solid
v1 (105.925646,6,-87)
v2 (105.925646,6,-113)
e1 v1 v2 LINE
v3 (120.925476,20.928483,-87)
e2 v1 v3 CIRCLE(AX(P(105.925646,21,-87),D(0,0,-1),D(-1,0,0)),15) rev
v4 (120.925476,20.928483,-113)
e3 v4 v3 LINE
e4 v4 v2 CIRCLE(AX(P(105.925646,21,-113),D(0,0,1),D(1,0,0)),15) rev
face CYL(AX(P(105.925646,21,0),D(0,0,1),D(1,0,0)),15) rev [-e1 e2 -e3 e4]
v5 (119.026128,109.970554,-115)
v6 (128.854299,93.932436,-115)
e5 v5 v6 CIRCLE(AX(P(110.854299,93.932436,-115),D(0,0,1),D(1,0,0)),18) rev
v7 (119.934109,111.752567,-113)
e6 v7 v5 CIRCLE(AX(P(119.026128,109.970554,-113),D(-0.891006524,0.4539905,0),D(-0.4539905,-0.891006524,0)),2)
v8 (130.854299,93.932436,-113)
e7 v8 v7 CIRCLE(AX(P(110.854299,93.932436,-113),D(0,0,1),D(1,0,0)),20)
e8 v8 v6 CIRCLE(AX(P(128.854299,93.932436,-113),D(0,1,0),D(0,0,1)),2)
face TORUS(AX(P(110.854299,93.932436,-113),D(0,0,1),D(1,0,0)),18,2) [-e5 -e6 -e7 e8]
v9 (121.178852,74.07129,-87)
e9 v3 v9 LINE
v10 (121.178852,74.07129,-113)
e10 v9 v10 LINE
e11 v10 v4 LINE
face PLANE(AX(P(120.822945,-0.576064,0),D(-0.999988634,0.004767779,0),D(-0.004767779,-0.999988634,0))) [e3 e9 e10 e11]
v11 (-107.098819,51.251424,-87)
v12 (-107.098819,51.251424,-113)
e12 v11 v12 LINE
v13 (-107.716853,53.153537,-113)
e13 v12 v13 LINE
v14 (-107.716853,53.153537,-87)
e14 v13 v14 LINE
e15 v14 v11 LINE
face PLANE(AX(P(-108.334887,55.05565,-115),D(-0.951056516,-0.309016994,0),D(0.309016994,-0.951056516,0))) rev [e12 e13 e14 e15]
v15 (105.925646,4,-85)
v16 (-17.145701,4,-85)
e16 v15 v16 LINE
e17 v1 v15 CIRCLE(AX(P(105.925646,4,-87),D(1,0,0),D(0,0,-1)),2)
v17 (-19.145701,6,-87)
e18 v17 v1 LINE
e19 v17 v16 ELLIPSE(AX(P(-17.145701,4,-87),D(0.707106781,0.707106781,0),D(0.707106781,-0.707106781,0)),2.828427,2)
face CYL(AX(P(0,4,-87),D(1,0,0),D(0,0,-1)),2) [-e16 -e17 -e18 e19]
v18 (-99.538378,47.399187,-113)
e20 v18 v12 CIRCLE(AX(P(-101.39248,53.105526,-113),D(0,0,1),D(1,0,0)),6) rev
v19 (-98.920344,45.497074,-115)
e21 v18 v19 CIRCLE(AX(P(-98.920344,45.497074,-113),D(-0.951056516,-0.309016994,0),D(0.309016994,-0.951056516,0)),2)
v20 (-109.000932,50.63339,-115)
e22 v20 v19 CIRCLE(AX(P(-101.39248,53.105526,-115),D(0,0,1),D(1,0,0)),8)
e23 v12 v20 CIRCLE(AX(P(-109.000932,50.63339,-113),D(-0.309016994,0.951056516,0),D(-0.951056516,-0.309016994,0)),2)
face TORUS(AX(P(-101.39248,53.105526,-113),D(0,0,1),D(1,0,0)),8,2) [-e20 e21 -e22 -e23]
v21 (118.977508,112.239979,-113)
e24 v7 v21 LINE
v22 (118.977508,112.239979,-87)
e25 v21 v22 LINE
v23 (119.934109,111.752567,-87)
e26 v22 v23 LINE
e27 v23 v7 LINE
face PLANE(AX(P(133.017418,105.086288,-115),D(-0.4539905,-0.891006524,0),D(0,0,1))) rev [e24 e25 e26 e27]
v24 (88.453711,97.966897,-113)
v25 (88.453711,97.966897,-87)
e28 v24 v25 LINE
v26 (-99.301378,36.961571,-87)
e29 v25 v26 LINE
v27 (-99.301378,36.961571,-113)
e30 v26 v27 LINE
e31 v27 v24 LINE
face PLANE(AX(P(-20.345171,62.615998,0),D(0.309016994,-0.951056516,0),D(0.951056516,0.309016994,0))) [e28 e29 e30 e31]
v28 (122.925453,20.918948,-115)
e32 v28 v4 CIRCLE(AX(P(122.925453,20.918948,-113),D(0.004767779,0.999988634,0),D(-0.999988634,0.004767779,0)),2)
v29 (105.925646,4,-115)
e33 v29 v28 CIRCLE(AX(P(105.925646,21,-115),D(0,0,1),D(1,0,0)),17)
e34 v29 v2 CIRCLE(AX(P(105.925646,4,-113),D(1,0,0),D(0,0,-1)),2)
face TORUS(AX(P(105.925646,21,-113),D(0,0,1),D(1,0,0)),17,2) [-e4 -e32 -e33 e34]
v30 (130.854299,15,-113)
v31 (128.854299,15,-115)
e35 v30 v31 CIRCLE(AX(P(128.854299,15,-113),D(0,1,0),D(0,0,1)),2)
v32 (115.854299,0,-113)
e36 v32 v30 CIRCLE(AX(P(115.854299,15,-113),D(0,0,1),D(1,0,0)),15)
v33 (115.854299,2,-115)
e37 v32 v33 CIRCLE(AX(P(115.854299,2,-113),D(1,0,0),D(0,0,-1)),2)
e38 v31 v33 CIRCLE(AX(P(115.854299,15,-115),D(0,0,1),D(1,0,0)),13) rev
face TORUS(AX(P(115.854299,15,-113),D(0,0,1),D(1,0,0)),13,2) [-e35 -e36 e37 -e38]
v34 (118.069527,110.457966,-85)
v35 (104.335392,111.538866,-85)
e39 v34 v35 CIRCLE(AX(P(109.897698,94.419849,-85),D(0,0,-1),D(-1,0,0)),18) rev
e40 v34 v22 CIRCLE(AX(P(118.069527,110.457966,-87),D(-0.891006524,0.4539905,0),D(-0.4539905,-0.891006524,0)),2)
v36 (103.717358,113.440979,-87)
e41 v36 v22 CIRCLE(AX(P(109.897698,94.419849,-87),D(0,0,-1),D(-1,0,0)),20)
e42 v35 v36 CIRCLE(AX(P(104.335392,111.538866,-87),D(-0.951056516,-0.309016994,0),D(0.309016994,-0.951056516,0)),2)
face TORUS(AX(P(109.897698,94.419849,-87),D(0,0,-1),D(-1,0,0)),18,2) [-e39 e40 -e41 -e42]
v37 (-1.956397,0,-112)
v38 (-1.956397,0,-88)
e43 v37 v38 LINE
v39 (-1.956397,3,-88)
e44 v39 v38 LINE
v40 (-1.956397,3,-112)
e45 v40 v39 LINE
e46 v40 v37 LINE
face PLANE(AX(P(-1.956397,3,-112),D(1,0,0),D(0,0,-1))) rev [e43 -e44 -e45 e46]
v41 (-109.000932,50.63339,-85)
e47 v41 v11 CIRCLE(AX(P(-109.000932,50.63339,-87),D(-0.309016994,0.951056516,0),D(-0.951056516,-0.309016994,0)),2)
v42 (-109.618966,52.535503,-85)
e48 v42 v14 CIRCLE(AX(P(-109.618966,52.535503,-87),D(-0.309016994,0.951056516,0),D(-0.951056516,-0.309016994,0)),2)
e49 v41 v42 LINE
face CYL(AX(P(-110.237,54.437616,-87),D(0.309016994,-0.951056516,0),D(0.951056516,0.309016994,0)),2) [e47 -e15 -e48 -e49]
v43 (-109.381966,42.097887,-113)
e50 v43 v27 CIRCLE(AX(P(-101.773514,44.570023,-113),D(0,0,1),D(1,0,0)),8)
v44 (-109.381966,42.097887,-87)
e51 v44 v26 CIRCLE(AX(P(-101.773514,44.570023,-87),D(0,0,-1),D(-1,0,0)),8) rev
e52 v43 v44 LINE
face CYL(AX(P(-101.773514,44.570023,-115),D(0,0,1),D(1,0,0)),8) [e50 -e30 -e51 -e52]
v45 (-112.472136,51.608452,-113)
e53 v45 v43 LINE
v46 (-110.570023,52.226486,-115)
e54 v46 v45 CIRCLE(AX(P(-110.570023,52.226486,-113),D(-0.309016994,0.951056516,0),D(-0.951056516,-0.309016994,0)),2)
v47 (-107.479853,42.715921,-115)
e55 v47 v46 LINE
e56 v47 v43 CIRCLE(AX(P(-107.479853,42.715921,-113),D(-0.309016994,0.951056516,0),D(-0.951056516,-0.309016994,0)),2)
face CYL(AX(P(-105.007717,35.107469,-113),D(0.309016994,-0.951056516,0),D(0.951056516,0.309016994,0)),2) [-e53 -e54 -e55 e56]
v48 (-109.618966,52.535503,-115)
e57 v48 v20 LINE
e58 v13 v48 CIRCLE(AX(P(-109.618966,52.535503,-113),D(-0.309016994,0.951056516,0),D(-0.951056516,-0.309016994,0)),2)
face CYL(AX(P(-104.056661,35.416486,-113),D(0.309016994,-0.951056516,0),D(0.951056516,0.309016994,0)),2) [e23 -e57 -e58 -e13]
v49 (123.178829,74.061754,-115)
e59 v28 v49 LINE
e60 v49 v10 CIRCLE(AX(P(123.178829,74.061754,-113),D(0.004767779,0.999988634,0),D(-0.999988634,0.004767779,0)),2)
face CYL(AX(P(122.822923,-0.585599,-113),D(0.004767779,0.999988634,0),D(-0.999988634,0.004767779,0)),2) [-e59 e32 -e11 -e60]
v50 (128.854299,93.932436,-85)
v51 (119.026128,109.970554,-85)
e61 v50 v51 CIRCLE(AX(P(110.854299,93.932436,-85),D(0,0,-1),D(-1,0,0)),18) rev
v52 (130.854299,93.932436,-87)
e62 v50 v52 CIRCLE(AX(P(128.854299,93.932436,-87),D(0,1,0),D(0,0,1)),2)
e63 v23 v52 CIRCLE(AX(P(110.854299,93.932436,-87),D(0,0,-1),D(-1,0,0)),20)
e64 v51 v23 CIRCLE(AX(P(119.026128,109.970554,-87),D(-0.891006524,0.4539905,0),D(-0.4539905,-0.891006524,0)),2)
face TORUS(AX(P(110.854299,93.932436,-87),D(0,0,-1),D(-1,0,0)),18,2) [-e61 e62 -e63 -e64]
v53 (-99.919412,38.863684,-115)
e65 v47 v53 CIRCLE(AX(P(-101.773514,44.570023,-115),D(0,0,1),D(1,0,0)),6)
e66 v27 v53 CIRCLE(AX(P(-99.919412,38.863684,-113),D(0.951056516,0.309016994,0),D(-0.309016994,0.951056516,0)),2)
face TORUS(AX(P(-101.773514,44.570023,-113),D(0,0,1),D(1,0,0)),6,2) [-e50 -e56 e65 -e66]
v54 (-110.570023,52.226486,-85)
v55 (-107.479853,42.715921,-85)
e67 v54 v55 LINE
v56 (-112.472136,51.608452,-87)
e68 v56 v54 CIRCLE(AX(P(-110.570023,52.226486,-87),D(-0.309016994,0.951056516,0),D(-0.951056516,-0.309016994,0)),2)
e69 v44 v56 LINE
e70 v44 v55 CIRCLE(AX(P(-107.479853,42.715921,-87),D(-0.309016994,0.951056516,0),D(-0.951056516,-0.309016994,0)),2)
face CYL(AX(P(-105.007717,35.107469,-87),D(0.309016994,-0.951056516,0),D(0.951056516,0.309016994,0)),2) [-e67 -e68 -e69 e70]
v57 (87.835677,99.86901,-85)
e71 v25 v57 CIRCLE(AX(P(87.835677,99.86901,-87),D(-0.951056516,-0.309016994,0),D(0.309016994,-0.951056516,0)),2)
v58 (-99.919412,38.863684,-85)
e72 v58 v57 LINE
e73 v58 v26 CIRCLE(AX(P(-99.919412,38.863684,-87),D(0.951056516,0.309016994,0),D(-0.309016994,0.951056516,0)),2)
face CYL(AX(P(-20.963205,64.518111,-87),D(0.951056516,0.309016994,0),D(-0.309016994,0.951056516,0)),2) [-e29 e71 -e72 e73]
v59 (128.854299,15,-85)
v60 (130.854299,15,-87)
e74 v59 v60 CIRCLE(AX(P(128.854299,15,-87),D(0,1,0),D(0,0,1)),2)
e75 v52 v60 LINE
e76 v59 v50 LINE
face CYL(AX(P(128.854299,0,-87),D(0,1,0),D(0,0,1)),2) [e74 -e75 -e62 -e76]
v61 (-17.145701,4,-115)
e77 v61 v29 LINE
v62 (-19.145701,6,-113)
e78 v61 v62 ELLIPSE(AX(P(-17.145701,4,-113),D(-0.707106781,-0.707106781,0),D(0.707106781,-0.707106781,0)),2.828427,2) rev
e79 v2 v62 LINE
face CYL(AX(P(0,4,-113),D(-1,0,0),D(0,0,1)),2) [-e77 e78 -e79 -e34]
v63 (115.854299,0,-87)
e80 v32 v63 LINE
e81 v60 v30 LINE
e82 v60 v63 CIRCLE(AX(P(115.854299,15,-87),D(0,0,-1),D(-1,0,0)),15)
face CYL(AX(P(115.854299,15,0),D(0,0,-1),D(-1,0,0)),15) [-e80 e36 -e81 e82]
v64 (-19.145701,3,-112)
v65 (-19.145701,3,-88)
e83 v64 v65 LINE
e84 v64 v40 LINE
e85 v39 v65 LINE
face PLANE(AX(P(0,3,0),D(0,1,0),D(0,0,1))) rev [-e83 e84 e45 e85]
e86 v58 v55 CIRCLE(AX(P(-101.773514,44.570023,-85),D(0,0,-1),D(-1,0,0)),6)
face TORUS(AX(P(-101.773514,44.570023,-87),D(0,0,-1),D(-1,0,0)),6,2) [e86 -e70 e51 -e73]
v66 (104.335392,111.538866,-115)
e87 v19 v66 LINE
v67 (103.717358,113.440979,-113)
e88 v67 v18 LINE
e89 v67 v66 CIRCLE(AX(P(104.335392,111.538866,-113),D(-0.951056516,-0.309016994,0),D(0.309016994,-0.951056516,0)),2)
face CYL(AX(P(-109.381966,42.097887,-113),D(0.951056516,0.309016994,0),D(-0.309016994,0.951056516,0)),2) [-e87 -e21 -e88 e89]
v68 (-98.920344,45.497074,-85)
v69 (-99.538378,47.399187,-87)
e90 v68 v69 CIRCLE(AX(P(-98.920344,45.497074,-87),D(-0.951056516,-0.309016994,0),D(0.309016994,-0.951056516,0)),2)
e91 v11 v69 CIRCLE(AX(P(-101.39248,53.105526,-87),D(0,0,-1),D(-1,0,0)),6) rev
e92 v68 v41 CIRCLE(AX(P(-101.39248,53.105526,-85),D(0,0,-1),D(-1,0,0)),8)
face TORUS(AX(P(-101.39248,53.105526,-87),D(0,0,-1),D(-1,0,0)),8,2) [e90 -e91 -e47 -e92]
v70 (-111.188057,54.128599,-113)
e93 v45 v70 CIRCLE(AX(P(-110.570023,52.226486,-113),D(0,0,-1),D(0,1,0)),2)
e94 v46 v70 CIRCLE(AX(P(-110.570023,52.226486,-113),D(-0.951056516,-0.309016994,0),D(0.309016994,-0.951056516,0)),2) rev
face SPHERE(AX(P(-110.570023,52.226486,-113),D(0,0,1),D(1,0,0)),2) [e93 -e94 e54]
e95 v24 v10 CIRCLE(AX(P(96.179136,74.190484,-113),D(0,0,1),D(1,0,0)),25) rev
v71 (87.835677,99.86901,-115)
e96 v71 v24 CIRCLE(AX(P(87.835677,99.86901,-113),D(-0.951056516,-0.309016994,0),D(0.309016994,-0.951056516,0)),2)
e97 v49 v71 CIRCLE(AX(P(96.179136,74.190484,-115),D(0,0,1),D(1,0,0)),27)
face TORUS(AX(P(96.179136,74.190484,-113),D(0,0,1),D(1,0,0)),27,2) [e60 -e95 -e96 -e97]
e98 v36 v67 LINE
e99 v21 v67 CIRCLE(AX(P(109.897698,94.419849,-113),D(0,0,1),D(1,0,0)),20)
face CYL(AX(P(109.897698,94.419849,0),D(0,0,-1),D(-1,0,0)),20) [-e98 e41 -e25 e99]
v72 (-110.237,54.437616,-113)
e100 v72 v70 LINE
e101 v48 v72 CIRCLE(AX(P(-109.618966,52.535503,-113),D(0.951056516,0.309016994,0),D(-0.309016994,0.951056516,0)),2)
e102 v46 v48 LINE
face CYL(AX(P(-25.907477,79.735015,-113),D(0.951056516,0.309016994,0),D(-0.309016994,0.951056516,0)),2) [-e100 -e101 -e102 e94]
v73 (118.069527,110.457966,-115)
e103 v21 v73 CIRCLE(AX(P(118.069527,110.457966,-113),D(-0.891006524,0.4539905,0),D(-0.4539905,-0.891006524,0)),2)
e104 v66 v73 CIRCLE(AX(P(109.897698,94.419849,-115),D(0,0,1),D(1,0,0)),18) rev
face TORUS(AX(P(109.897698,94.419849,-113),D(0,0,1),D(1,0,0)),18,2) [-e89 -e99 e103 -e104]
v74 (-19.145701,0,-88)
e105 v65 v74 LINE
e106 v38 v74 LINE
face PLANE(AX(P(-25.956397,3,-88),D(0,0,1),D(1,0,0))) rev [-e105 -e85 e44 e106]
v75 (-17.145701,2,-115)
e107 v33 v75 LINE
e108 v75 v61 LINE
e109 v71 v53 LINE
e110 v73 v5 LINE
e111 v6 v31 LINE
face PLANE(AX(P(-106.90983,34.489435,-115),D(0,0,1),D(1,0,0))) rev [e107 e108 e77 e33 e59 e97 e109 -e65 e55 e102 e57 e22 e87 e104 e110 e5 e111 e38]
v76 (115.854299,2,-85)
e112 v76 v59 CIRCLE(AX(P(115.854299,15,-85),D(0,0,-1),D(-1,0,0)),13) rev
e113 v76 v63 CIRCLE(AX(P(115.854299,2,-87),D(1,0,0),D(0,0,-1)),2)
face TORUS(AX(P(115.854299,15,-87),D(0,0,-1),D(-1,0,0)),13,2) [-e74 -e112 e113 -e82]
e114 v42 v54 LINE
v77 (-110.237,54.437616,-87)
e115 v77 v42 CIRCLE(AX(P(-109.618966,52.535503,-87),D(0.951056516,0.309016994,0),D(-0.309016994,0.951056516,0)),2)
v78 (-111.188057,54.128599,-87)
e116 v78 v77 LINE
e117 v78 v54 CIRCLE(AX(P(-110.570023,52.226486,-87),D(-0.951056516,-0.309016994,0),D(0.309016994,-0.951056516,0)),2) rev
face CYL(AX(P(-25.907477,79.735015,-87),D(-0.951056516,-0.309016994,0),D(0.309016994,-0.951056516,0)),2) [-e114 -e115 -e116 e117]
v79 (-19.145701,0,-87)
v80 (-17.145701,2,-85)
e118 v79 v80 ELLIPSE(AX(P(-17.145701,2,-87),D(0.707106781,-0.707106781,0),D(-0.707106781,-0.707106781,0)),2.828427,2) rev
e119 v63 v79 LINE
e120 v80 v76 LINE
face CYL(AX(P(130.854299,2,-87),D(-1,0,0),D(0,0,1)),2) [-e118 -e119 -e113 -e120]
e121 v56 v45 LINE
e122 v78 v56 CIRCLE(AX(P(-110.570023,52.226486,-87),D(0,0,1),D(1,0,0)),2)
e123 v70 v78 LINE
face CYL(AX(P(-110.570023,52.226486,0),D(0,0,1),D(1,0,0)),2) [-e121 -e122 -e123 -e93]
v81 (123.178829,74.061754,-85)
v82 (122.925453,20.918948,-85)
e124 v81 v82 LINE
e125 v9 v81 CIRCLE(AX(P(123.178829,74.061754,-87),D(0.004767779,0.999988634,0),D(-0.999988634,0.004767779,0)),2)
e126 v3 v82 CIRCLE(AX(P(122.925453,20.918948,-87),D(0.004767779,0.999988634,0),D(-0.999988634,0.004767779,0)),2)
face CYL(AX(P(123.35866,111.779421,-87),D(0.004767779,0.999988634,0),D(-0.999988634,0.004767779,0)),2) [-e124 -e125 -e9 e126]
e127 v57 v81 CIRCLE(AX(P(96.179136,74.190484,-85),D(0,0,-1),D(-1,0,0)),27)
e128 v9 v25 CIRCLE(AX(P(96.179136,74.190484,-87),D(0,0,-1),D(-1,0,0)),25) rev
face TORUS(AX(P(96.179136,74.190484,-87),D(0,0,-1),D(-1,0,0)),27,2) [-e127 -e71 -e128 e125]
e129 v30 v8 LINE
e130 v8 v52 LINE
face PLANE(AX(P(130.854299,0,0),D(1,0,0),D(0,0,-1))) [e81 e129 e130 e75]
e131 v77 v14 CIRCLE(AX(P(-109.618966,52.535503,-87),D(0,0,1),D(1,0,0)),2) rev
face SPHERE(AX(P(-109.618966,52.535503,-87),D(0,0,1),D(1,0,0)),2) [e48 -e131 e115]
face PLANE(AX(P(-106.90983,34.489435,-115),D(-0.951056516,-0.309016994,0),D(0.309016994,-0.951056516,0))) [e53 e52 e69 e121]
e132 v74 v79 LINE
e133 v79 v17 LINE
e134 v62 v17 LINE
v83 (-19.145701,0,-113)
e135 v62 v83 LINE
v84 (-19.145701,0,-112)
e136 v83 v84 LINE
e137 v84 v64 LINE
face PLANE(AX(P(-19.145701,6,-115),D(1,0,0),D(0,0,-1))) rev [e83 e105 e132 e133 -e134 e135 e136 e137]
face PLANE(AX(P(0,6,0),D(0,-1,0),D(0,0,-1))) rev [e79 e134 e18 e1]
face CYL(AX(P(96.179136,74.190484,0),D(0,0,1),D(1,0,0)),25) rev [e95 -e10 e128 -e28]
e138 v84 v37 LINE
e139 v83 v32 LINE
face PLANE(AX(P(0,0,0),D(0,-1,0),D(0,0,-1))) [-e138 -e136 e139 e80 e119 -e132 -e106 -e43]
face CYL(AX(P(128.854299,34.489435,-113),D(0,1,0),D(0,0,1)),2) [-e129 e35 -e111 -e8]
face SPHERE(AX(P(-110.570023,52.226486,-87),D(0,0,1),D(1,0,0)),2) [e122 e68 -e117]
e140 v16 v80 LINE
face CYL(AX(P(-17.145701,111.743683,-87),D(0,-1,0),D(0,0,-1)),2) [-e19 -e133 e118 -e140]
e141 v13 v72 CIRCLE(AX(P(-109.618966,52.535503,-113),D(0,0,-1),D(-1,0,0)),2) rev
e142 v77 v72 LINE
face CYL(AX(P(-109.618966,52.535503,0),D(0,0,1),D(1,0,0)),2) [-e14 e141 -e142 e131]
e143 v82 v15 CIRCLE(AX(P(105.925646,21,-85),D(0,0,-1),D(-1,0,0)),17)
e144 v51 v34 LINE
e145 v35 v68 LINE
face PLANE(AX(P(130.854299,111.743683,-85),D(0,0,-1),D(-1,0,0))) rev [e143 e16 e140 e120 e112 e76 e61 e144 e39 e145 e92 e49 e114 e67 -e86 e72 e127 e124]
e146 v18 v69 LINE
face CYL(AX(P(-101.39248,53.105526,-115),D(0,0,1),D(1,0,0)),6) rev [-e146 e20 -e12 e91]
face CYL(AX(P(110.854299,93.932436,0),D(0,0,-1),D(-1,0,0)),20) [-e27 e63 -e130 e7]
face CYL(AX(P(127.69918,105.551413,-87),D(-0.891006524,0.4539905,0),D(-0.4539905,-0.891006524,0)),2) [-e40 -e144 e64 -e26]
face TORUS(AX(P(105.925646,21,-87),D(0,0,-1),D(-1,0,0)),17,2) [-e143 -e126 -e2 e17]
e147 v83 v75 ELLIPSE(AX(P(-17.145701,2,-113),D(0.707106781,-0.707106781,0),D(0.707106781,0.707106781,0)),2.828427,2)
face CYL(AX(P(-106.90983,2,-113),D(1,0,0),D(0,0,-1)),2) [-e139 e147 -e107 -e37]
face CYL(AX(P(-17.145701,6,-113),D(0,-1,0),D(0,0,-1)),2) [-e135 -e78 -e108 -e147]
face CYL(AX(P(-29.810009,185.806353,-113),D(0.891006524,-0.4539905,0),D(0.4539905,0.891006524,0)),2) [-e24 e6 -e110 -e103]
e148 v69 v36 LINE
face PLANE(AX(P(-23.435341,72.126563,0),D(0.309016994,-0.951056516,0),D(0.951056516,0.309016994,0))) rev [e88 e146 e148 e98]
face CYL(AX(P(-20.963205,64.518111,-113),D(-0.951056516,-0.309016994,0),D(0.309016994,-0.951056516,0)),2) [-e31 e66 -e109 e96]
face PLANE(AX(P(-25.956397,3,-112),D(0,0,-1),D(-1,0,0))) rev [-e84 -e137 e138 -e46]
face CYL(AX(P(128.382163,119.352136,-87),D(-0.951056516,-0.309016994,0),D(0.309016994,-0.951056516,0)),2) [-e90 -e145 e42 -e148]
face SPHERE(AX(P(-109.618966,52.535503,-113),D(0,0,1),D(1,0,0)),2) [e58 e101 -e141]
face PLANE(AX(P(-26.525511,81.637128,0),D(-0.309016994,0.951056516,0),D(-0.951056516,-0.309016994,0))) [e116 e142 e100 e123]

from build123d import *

# Parameters (mm, degrees)
SKETCH2_W           = 250
SKETCH2_H           = 30
BOSS_EXTRUDE1_DEPTH = 10
SKETCH3_W           = 5
SKETCH3_H           = 30
BOSS_EXTRUDE2_DEPTH = 10
SKETCH4_W           = 150
SKETCH4_H           = 30
BOSS_EXTRUDE3_DEPTH = 6
FILLET1_R           = 15
FILLET8_R           = 25
CHAMFER1_SIZE       = 17
FILLET3_R           = 20
FILLET5_R           = 6
FILLET6_R           = 2
FILLET7_R           = 8
SKETCH7_W           = 24
SKETCH7_H           = 24
CUT_EXTRUDE1_DEPTH  = 3


with BuildPart() as part:
    # Sketch2 → Boss-Extrude1 (new body)
    with BuildSketch(Plane(origin=(-23.43534086, 72.126562752, 0), x_dir=(0.9510565162951534, 0.3090169943749482, 0), z_dir=(-0.3090169943749481, 0.9510565162951533, 0))):
        with Locations((33.98053096, 100)):
            Rectangle(SKETCH2_W, SKETCH2_H)
    extrude(amount=-BOSS_EXTRUDE1_DEPTH)

    # Sketch3 → Boss-Extrude2 (add)
    with BuildSketch(Plane(origin=(-23.43534086, 72.126562752, 0), x_dir=(0.9510565162951534, 0.3090169943749482, 0), z_dir=(-0.3090169943749481, 0.9510565162951533, 0))):
        with Locations((-88.51946904, 100)):
            Rectangle(SKETCH3_W, SKETCH3_H)
    extrude(amount=BOSS_EXTRUDE2_DEPTH)



with BuildPart() as body_2:
    # Sketch4 → Boss-Extrude3 (new body)
    with BuildSketch(Plane(origin=(0, 0, 0), x_dir=(1, 0, 0), z_dir=(0, 1, 0))):
        with Locations((55.854299018, 100)):
            Rectangle(SKETCH4_W, SKETCH4_H)
    extrude(amount=BOSS_EXTRUDE3_DEPTH)


with BuildPart() as part_1:
    add(part.part)

    add(body_2.part)  # Loft1 merges body 2
    # Sketch6 → Loft1 section 0
    with BuildSketch(Plane(origin=(-20.345170916, 62.615997589, 0), x_dir=(0.9510565162951534, 0.3090169943749482, 0), z_dir=(0.3090169943749481, -0.9510565162951533, 0))):
        with BuildLine():
            Line((158.98053096, -85), (148.98053096, -85))
            Line((148.98053096, -85), (148.98053096, -115))
            Line((148.98053096, -115), (158.98053096, -115))
            Line((158.98053096, -115), (158.98053096, -85))
        make_face()
    # Sketch5 → Loft1 section 1
    with BuildSketch(Plane(origin=(0, 6, 0), x_dir=(1, 0, 0), z_dir=(0, 1, 0))):
        with BuildLine():
            Line((130.854299018, 115), (120.854299018, 115))
            Line((120.854299018, 115), (120.854299018, 85))
            Line((120.854299018, 85), (130.854299018, 85))
            Line((130.854299018, 85), (130.854299018, 115))
        make_face()
    loft()

    # Fillet1
    fillet1_edges = [part_1.edges().sort_by_distance(p)[0] for p in [
        (130.854299018, 0, -100),
        (120.854299018, 6, -100),
    ]]
    fillet(fillet1_edges, radius=FILLET1_R)

    # Fillet8
    fillet8_edges = [part_1.edges().sort_by_distance(p)[0] for p in [
        (121.343733855, 108.653513487, -100),
    ]]
    fillet(fillet8_edges, radius=FILLET8_R)

    # Chamfer1
    # the kernel refuses this chamfer: 17 mm, written as the material it takes off along each edge
    with BuildSketch(Plane(origin=(127.764129074, 121.254248594, -41.281389205), x_dir=(-0.9591936310578489, -0.28275002765350715, 0), z_dir=(0, 0, -1))) as chamfer1_piece_1:
        Polygon((CHAMFER1_SIZE * 0.999621916911, -CHAMFER1_SIZE * 0.0274958766106), (-CHAMFER1_SIZE * 0.0274958766106, -CHAMFER1_SIZE * 0.999621916911), (0, 0), align=None)
    extrude(amount=117.437221591, mode=Mode.SUBTRACT)

    # Fillet3
    fillet3_edges = [part_1.edges().sort_by_distance(p)[0] for p in [
        (130.854299018, 106.188451977, -100),
        (111.596168297, 116.000959689, -100),
    ]]
    fillet(fillet3_edges, radius=FILLET3_R)

    # Fillet5
    fillet5_edges = [part_1.edges().sort_by_distance(p)[0] for p in [
        (-105.244717419, 45.545084972, -100),
    ]]
    fillet(fillet5_edges, radius=FILLET5_R)

    # Fillet6
    fillet6_edges = [part_1.edges().sort_by_distance(p)[0] for p in [
        (2.089489912, 80.420083013, -115),
        (-104.116423285, 47.759486891, -115),
        (-104.116423285, 47.759486891, -85),
        (-107.716853374, 53.153537102, -85),
        (-107.716853374, 53.153537102, -115),
        (-113.090169944, 53.510565163, -100),
        (-9.228059595, 66.228166023, -115),
        (-110.712528653, 54.283107649, -85),
        (-108.334887362, 55.055650135, -100),
        (-110.712528653, 54.283107649, -115),
        (43.389972522, 6, -85),
        (-19.145700982, 3, -115),
        (48.354299018, 0, -85),
        (-19.145700982, 3, -85),
        (43.389972522, 6, -115),
        (48.354299018, 0, -115),
        (126.460900735, 4.393398282, -115),
        (126.460900735, 4.393398282, -85),
        (116.506932566, 10.368143382, -85),
        (116.506932566, 10.368143382, -115),
        (121.052163557, 47.499886569, -115),
        (121.052163557, 47.499886569, -85),
        (-9.228059595, 66.228166023, -85),
        (110.921940595, 94.380821213, -115),
        (110.921940595, 94.380821213, -85),
        (-110, 44, -115),
        (-110, 44, -85),
        (130.854299018, 54.466218107, -115),
        (130.854299018, 54.466218107, -85),
        (119.455808519, 111.996272972, -85),
        (2.089489912, 80.420083013, -85),
        (111.466879946, 114.358195437, -85),
        (127.907102305, 104.382407509, -85),
        (119.455808519, 111.996272972, -115),
        (111.466879946, 114.358195437, -115),
        (127.907102305, 104.382407509, -115),
    ]]
    fillet(fillet6_edges, radius=FILLET6_R)

    # Fillet7
    # the kernel refuses this fillet: 8 mm, written as the material it takes off along each edge
    with BuildSketch(Plane(origin=(-101.773513881, 44.570022922, -85), x_dir=(-0.9510565162951534, -0.3090169943749482, 0), z_dir=(-0.3090169943749482, 0.9510565162951534, 0))) as fillet7_piece_1:
        with BuildLine():
            CenterArc((6, -2), 2, 0, 90)
            Line((8, -2), (8, 0))
            Line((8, 0), (6, 0))
        make_face()
    revolve(axis=Axis((-101.773513881, 44.570022922, -85), (0, 0, 1)), revolution_arc=90, mode=Mode.SUBTRACT)
    with BuildSketch(Plane(origin=(-101.773513881, 44.570022922, -115), x_dir=(0.3090169943749482, -0.9510565162951534, 0), z_dir=(0.9510565162951534, 0.3090169943749482, 0))) as fillet7_piece_2:
        with BuildLine():
            CenterArc((6, -2), 2, 0, 90)
            Line((8, -2), (8, 0))
            Line((8, 0), (6, 0))
        make_face()
    revolve(axis=Axis((-101.773513881, 44.570022922, -115), (0, 0, -1)), revolution_arc=90, mode=Mode.SUBTRACT)
    with BuildSketch(Plane(origin=(-106.909830056, 34.489434837, -115), x_dir=(0.9510565162951533, 0.3090169943749485, 0), z_dir=(0, 0, 1))) as fillet7_piece_3:
        with BuildLine():
            CenterArc((FILLET7_R, FILLET7_R), FILLET7_R, 180, 90)
            Line((0, FILLET7_R), (0, 0))
            Line((0, 0), (FILLET7_R, 0))
        make_face()
    extrude(amount=30, mode=Mode.SUBTRACT)

    # Sketch7 → Cut-Extrude1 (cut)
    with BuildSketch(Plane.XZ):
        with Locations((-13.956396798, -100)):
            Rectangle(SKETCH7_W, SKETCH7_H)
    extrude(amount=-CUT_EXTRUDE1_DEPTH, mode=Mode.SUBTRACT)


solid = part_1.part
